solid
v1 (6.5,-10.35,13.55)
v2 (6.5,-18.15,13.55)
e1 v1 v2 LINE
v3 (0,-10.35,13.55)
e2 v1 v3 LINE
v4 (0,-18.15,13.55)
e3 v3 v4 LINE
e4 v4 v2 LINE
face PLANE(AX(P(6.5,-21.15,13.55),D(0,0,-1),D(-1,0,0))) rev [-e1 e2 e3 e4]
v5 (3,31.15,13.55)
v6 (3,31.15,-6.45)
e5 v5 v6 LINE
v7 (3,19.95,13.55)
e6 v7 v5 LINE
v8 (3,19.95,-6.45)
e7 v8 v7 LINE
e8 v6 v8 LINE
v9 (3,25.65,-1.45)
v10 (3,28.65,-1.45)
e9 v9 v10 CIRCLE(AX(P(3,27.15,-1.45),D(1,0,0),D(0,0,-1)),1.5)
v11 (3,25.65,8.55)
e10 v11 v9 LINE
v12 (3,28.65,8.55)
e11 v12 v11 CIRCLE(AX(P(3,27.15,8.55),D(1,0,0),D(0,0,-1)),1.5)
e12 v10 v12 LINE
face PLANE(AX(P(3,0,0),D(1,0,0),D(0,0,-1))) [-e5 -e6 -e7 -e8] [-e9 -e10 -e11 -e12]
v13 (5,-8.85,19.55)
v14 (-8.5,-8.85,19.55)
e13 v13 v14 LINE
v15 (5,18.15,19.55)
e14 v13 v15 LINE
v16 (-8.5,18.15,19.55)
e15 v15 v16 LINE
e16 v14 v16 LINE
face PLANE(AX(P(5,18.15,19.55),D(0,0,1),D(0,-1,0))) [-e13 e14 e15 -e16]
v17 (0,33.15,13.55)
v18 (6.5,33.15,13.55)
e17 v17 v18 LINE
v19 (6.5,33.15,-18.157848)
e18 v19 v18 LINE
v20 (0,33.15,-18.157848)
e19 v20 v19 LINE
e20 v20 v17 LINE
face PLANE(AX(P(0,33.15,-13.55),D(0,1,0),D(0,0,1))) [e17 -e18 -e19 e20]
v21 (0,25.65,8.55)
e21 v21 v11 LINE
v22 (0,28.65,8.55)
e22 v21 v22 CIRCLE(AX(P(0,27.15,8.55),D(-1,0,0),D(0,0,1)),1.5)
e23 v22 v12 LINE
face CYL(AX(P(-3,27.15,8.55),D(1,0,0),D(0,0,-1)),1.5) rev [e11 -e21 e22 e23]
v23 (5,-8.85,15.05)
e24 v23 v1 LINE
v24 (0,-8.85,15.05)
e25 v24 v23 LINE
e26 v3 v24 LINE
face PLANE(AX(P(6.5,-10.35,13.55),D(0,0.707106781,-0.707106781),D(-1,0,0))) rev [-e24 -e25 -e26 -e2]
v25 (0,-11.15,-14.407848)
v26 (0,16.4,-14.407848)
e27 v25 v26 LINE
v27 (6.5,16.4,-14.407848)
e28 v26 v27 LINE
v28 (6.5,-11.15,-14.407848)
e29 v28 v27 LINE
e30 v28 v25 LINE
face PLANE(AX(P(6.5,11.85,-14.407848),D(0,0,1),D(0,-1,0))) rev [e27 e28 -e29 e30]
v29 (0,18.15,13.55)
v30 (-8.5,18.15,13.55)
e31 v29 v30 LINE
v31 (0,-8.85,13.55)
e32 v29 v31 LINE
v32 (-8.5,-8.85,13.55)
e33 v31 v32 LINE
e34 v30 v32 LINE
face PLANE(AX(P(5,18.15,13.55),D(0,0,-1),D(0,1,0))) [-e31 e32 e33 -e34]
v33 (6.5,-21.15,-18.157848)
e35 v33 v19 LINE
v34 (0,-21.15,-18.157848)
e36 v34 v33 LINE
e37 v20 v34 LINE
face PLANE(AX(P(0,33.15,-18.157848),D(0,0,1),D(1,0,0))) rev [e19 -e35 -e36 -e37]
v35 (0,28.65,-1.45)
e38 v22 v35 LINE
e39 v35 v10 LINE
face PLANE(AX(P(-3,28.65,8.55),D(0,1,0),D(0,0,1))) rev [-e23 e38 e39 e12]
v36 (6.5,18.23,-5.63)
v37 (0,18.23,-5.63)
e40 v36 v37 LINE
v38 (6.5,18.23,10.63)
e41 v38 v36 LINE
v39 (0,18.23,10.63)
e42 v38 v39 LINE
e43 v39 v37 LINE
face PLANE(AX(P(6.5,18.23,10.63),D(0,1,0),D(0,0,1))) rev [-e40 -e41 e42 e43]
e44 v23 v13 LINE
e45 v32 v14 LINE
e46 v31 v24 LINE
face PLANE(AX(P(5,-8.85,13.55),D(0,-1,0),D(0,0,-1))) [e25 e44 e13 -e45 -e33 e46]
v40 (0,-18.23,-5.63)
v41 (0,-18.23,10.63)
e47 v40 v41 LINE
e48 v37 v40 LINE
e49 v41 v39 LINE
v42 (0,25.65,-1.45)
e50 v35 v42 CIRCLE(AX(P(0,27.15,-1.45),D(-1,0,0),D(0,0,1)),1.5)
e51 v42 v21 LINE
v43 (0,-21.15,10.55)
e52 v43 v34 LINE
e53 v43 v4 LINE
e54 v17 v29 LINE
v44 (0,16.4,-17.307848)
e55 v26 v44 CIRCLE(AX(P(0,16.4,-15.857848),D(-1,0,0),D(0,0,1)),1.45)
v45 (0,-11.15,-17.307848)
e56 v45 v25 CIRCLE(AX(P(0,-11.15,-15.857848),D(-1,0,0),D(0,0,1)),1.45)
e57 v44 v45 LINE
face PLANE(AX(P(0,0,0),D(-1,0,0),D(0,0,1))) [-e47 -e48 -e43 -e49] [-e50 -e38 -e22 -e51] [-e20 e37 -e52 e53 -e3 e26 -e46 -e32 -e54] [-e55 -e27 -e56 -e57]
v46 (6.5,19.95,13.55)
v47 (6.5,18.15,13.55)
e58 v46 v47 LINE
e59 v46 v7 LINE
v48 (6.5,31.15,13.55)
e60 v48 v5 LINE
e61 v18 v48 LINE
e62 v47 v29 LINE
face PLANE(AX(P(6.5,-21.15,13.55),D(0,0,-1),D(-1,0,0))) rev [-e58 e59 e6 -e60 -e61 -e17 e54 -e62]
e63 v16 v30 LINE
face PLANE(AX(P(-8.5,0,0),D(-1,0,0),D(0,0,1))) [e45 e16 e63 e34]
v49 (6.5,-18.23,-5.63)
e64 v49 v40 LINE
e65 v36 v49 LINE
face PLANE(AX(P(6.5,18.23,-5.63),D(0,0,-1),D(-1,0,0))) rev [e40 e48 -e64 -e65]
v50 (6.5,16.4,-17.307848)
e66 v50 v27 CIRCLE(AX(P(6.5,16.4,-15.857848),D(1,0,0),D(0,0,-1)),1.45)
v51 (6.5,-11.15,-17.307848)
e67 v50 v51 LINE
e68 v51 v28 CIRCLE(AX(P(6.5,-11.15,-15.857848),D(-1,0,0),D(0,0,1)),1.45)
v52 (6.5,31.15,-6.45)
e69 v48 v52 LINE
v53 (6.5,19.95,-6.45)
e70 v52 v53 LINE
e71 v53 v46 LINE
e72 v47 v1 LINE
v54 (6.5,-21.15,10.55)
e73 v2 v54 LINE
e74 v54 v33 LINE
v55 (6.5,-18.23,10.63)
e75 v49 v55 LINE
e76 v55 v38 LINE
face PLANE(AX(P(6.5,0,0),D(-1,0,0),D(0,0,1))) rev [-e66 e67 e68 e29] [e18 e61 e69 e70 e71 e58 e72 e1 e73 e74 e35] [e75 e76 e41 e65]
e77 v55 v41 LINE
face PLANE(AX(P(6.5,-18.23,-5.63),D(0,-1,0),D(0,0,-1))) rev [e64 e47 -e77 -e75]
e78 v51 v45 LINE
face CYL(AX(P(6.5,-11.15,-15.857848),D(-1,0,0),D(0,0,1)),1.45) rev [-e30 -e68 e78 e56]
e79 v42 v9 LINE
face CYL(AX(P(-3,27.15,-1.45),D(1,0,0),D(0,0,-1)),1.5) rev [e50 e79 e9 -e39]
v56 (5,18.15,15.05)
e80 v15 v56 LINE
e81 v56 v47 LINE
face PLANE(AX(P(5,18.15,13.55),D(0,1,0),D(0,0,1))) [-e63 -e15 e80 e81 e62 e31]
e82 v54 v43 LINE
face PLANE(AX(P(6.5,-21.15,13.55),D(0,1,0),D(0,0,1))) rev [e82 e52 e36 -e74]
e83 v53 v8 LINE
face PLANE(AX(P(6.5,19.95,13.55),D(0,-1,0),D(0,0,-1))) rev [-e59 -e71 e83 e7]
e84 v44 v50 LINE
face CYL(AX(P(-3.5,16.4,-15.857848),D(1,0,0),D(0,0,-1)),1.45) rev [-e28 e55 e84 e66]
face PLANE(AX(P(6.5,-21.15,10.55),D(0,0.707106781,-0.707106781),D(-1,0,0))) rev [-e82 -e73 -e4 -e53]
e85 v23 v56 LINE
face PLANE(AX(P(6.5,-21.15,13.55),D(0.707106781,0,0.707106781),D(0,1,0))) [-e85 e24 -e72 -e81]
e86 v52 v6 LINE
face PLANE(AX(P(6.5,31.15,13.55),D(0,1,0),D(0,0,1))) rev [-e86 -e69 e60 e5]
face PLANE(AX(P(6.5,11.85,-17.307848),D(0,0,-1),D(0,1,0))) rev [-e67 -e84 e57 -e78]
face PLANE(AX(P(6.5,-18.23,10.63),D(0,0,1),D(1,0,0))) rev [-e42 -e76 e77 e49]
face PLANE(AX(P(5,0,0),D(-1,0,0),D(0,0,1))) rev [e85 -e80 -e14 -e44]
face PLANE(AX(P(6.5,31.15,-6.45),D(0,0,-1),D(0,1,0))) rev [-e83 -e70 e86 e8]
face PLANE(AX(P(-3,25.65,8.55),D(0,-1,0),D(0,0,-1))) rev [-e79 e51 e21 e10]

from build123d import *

# Parameters (mm, degrees)
SKETCH_1_W               = 27.1
SKETCH_1_H               = 42.3
SKETCH_1_W_2             = 21.1
SKETCH_1_H_2             = 36.3
EXTRUDE_1_DEPTH          = 6.5
CHAMFER_1_SIZE           = 3
EXTRUDE_2_DEPTH          = 8.7
EXTRUDE_2_DEPTH_BACK     = 6.5
SKETCH_2_W               = 5
SKETCH_2_H               = 24.3
SKETCH_2_R               = 1.475
SKETCH_3_W               = 27.1
SKETCH_3_H               = 15
EXTRUDE_3_DEPTH          = 6.5
SKETCH_4_W               = 17.60784849
SKETCH_4_H               = 15
EXTRUDE_4_DEPTH          = 6.5
SKETCH_5_W               = 20
SKETCH_5_H               = 11
SKETCH_5_W_2             = 5
SKETCH_5_H_2             = 36.3
EXTRUDE_5_DEPTH          = 6.5
CUT_EXTRUDE_5_DEPTH      = 47.31872216
CUT_EXTRUDE_5_DEPTH_BACK = 47.31872216
SKETCH_6_W               = 20
SKETCH_6_H               = 11.2
CUT_EXTRUDE_6_DEPTH      = 48.966384297
CUT_EXTRUDE_6_DEPTH_BACK = 48.966384297
SKETCH_9_W               = 5
SKETCH_9_H               = 24.3
SKETCH_10_W              = 20
SKETCH_10_H              = 11.2
EXTRUDE_6_DEPTH          = 3
CUT_EXTRUDE_7_DEPTH      = 46.956327339
CUT_EXTRUDE_7_DEPTH_BACK = 46.956327339
SKETCH_11_W              = 13
SKETCH_11_H              = 15
EXTRUDE_7_DEPTH          = 8.5
EXTRUDE_7_DEPTH_BACK     = 5
SKETCH_13_W              = 6
SKETCH_13_H              = 27
CHAMFER_2_SIZE           = 1.5
SKETCH_14_W              = 16.26
SKETCH_14_H              = 36.46
SKETCH_14_W_2            = 16.1
SKETCH_14_H_2            = 36.3
CUT_EXTRUDE_8_DEPTH      = 40.412878606
SKETCH_15_W              = 7.60784849
SKETCH_15_H              = 39.3
EXTRUDE_8_DEPTH          = 6
CUT_EXTRUDE_9_DEPTH      = 6
EXTRUDE_9_DEPTH          = 0.5
CUT_EXTRUDE_10_DEPTH     = 40.412878606
CUT_EXTRUDE_11_DEPTH     = 10


with BuildPart() as part:
    # 草图1 → 凸台-拉伸1 (new body)
    with BuildSketch(Plane(origin=(0, 0, 0), x_dir=(0, 0, -1), z_dir=(1, 0, 0))):
        Rectangle(SKETCH_1_W, SKETCH_1_H)
        Rectangle(SKETCH_1_W_2, SKETCH_1_H_2, mode=Mode.SUBTRACT)
    extrude(amount=EXTRUDE_1_DEPTH)

    # 倒角1
    chamfer_1_edges = [part.edges().sort_by_distance(p)[0] for p in [
        (3.25, 21.15, 13.55),
        (3.25, 21.15, -13.55),
        (3.25, -21.15, -13.55),
        (3.25, -21.15, 13.55),
    ]]
    chamfer(chamfer_1_edges, length=CHAMFER_1_SIZE)

    # 草图2 → 凸台-拉伸2 (add, two sides: drawn at the far end of the back side and taken through both)
    with BuildSketch(Plane.ZY.offset(-EXTRUDE_2_DEPTH_BACK)):
        with Locations((16.05, 0)):
            Rectangle(SKETCH_2_W, SKETCH_2_H)
        with Locations((16.05, 7.15)):
            Circle(SKETCH_2_R, mode=Mode.SUBTRACT)
        with Locations((16.05, -7.15)):
            Circle(SKETCH_2_R, mode=Mode.SUBTRACT)
    extrude(amount=EXTRUDE_2_DEPTH + EXTRUDE_2_DEPTH_BACK)

    # 草图3 → 凸台-拉伸3 (add)
    with BuildSketch(Plane(origin=(6.5, 0, 0), x_dir=(0, 0, -1), z_dir=(1, 0, 0))):
        with Locations((0, 25.65)):
            Rectangle(SKETCH_3_W, SKETCH_3_H)
    extrude(amount=-EXTRUDE_3_DEPTH)

    # 草图4 → 凸台-拉伸4 (add)
    with BuildSketch(Plane.ZY):
        with Locations((-22.353924245, 25.65)):
            Rectangle(SKETCH_4_W, SKETCH_4_H)
    extrude(amount=-EXTRUDE_4_DEPTH)

    # 草图5 → 凸台-拉伸5 (add)
    with BuildSketch(Plane.ZY):
        with Locations((3.55, 25.714062057)):
            Rectangle(SKETCH_5_W, SKETCH_5_H)
        with Locations((-8.05, 0)):
            Rectangle(SKETCH_5_W_2, SKETCH_5_H_2)
    extrude(amount=-EXTRUDE_5_DEPTH)

    # 草图6 → 切除-拉伸5 (cut, two sides: drawn at the far end of the back side and taken through both)
    with BuildSketch(Plane.ZY.offset(-CUT_EXTRUDE_5_DEPTH_BACK)):
        with Locations((3.55, 25.55)):
            Rectangle(SKETCH_6_W, SKETCH_6_H)
    extrude(amount=CUT_EXTRUDE_5_DEPTH + CUT_EXTRUDE_5_DEPTH_BACK, mode=Mode.SUBTRACT)

    # 草图9 → 切除-拉伸6 (cut, two sides: drawn at the far end of the back side and taken through both)
    with BuildSketch(Plane.ZY.offset(8.7).offset(-CUT_EXTRUDE_6_DEPTH_BACK)):
        with Locations((16.05, 0)):
            Rectangle(SKETCH_9_W, SKETCH_9_H)
    extrude(amount=CUT_EXTRUDE_6_DEPTH + CUT_EXTRUDE_6_DEPTH_BACK, mode=Mode.SUBTRACT)

    # 草图10 → 凸台-拉伸6 (add)
    with BuildSketch(Plane.ZY):
        with Locations((3.55, 25.55)):
            Rectangle(SKETCH_10_W, SKETCH_10_H)
    extrude(amount=-EXTRUDE_6_DEPTH)

    # 草图11 → 切除-拉伸7 (cut, two sides: drawn at the far end of the back side and taken through both)
    with BuildSketch(Plane(origin=(6.5, 0, 0), x_dir=(0, 0, -1), z_dir=(1, 0, 0)).offset(-CUT_EXTRUDE_7_DEPTH_BACK)):
        with Locations((24.65784849, 25.65)):
            Rectangle(SKETCH_11_W, SKETCH_11_H)
    extrude(amount=CUT_EXTRUDE_7_DEPTH + CUT_EXTRUDE_7_DEPTH_BACK, mode=Mode.SUBTRACT)

    # 草图13 → 凸台-拉伸7 (add, two sides: drawn at the far end of the back side and taken through both)
    with BuildSketch(Plane.ZY.offset(-EXTRUDE_7_DEPTH_BACK)):
        with Locations((16.55, 4.65)):
            Rectangle(SKETCH_13_W, SKETCH_13_H)
    extrude(amount=EXTRUDE_7_DEPTH + EXTRUDE_7_DEPTH_BACK)

    # 倒角2
    chamfer_2_edges = [part.edges().sort_by_distance(p)[0] for p in [
        (5, 4.65, 13.55),
        (2.5, -8.85, 13.55),
    ]]
    chamfer(chamfer_2_edges, length=CHAMFER_2_SIZE - 0.0001)  # a hair under: the kernel refuses the full size

    # 草图14 → 切除-拉伸8 (cut, through all)
    with BuildSketch(Plane.ZY):
        with Locations((2.5, 0)):
            Rectangle(SKETCH_14_W, SKETCH_14_H)
        with Locations((2.5, 0)):
            Rectangle(SKETCH_14_W_2, SKETCH_14_H_2, mode=Mode.SUBTRACT)
    extrude(amount=-CUT_EXTRUDE_8_DEPTH, mode=Mode.SUBTRACT)

    # 草图15 → 凸台-拉伸8 (add)
    with BuildSketch(Plane(origin=(6.5, 0, 0), x_dir=(0, 0, -1), z_dir=(1, 0, 0))):
        with Locations((14.353924245, -1.5)):
            Rectangle(SKETCH_15_W, SKETCH_15_H)
    extrude(amount=-EXTRUDE_8_DEPTH)

    # 草图16 → 切除-拉伸9 (cut)
    with BuildSketch(Plane(origin=(3, 0, 0), x_dir=(0, 0, -1), z_dir=(1, 0, 0))):
        with BuildLine():
            Line((-8.55, 28.65), (1.45, 28.65))
            ThreePointArc((1.45, 28.65), (2.95, 27.15), (1.45, 25.65))
            Line((1.45, 25.65), (-8.55, 25.65))
            ThreePointArc((-8.55, 25.65), (-10.05, 27.15), (-8.55, 28.65))
        make_face()
    extrude(amount=-CUT_EXTRUDE_9_DEPTH, mode=Mode.SUBTRACT)

    # 草图17 → 凸台-拉伸9 (add)
    with BuildSketch(Plane.ZY.offset(-0.5)):
        Polygon((-13.55, -18.15), (-13.55, 18.15), (-18.15784849, 18.15), (-18.15784849, -21.15), (-10.55, -21.15), align=None)
    extrude(amount=EXTRUDE_9_DEPTH)

    # 草图18 → 切除-拉伸10 (cut, through all)
    with BuildSketch(Plane.ZY):
        with BuildLine():
            Line((-14.40784849, 11.85), (-14.40784849, -11.15))
            ThreePointArc((-14.40784849, -11.15), (-15.85784849, -12.6), (-17.30784849, -11.15))
            Line((-17.30784849, -11.15), (-17.30784849, 11.85))
            ThreePointArc((-17.30784849, 11.85), (-15.85784849, 13.3), (-14.40784849, 11.85))
        make_face()
    extrude(amount=-CUT_EXTRUDE_10_DEPTH, mode=Mode.SUBTRACT)

    # 草图19 → 切除-拉伸11 (cut)
    with BuildSketch(Plane(origin=(6.5, 0, 0), x_dir=(0, 0, -1), z_dir=(1, 0, 0))):
        with BuildLine():
            Line((14.40784849, 11.85), (17.30784849, 11.85))
            Line((17.30784849, 11.85), (17.30784849, 16.4))
            ThreePointArc((17.30784849, 16.4), (15.85784849, 17.85), (14.40784849, 16.4))
            Line((14.40784849, 16.4), (14.40784849, 11.85))
        make_face()
    extrude(amount=-CUT_EXTRUDE_11_DEPTH, mode=Mode.SUBTRACT)


solid = part.part
